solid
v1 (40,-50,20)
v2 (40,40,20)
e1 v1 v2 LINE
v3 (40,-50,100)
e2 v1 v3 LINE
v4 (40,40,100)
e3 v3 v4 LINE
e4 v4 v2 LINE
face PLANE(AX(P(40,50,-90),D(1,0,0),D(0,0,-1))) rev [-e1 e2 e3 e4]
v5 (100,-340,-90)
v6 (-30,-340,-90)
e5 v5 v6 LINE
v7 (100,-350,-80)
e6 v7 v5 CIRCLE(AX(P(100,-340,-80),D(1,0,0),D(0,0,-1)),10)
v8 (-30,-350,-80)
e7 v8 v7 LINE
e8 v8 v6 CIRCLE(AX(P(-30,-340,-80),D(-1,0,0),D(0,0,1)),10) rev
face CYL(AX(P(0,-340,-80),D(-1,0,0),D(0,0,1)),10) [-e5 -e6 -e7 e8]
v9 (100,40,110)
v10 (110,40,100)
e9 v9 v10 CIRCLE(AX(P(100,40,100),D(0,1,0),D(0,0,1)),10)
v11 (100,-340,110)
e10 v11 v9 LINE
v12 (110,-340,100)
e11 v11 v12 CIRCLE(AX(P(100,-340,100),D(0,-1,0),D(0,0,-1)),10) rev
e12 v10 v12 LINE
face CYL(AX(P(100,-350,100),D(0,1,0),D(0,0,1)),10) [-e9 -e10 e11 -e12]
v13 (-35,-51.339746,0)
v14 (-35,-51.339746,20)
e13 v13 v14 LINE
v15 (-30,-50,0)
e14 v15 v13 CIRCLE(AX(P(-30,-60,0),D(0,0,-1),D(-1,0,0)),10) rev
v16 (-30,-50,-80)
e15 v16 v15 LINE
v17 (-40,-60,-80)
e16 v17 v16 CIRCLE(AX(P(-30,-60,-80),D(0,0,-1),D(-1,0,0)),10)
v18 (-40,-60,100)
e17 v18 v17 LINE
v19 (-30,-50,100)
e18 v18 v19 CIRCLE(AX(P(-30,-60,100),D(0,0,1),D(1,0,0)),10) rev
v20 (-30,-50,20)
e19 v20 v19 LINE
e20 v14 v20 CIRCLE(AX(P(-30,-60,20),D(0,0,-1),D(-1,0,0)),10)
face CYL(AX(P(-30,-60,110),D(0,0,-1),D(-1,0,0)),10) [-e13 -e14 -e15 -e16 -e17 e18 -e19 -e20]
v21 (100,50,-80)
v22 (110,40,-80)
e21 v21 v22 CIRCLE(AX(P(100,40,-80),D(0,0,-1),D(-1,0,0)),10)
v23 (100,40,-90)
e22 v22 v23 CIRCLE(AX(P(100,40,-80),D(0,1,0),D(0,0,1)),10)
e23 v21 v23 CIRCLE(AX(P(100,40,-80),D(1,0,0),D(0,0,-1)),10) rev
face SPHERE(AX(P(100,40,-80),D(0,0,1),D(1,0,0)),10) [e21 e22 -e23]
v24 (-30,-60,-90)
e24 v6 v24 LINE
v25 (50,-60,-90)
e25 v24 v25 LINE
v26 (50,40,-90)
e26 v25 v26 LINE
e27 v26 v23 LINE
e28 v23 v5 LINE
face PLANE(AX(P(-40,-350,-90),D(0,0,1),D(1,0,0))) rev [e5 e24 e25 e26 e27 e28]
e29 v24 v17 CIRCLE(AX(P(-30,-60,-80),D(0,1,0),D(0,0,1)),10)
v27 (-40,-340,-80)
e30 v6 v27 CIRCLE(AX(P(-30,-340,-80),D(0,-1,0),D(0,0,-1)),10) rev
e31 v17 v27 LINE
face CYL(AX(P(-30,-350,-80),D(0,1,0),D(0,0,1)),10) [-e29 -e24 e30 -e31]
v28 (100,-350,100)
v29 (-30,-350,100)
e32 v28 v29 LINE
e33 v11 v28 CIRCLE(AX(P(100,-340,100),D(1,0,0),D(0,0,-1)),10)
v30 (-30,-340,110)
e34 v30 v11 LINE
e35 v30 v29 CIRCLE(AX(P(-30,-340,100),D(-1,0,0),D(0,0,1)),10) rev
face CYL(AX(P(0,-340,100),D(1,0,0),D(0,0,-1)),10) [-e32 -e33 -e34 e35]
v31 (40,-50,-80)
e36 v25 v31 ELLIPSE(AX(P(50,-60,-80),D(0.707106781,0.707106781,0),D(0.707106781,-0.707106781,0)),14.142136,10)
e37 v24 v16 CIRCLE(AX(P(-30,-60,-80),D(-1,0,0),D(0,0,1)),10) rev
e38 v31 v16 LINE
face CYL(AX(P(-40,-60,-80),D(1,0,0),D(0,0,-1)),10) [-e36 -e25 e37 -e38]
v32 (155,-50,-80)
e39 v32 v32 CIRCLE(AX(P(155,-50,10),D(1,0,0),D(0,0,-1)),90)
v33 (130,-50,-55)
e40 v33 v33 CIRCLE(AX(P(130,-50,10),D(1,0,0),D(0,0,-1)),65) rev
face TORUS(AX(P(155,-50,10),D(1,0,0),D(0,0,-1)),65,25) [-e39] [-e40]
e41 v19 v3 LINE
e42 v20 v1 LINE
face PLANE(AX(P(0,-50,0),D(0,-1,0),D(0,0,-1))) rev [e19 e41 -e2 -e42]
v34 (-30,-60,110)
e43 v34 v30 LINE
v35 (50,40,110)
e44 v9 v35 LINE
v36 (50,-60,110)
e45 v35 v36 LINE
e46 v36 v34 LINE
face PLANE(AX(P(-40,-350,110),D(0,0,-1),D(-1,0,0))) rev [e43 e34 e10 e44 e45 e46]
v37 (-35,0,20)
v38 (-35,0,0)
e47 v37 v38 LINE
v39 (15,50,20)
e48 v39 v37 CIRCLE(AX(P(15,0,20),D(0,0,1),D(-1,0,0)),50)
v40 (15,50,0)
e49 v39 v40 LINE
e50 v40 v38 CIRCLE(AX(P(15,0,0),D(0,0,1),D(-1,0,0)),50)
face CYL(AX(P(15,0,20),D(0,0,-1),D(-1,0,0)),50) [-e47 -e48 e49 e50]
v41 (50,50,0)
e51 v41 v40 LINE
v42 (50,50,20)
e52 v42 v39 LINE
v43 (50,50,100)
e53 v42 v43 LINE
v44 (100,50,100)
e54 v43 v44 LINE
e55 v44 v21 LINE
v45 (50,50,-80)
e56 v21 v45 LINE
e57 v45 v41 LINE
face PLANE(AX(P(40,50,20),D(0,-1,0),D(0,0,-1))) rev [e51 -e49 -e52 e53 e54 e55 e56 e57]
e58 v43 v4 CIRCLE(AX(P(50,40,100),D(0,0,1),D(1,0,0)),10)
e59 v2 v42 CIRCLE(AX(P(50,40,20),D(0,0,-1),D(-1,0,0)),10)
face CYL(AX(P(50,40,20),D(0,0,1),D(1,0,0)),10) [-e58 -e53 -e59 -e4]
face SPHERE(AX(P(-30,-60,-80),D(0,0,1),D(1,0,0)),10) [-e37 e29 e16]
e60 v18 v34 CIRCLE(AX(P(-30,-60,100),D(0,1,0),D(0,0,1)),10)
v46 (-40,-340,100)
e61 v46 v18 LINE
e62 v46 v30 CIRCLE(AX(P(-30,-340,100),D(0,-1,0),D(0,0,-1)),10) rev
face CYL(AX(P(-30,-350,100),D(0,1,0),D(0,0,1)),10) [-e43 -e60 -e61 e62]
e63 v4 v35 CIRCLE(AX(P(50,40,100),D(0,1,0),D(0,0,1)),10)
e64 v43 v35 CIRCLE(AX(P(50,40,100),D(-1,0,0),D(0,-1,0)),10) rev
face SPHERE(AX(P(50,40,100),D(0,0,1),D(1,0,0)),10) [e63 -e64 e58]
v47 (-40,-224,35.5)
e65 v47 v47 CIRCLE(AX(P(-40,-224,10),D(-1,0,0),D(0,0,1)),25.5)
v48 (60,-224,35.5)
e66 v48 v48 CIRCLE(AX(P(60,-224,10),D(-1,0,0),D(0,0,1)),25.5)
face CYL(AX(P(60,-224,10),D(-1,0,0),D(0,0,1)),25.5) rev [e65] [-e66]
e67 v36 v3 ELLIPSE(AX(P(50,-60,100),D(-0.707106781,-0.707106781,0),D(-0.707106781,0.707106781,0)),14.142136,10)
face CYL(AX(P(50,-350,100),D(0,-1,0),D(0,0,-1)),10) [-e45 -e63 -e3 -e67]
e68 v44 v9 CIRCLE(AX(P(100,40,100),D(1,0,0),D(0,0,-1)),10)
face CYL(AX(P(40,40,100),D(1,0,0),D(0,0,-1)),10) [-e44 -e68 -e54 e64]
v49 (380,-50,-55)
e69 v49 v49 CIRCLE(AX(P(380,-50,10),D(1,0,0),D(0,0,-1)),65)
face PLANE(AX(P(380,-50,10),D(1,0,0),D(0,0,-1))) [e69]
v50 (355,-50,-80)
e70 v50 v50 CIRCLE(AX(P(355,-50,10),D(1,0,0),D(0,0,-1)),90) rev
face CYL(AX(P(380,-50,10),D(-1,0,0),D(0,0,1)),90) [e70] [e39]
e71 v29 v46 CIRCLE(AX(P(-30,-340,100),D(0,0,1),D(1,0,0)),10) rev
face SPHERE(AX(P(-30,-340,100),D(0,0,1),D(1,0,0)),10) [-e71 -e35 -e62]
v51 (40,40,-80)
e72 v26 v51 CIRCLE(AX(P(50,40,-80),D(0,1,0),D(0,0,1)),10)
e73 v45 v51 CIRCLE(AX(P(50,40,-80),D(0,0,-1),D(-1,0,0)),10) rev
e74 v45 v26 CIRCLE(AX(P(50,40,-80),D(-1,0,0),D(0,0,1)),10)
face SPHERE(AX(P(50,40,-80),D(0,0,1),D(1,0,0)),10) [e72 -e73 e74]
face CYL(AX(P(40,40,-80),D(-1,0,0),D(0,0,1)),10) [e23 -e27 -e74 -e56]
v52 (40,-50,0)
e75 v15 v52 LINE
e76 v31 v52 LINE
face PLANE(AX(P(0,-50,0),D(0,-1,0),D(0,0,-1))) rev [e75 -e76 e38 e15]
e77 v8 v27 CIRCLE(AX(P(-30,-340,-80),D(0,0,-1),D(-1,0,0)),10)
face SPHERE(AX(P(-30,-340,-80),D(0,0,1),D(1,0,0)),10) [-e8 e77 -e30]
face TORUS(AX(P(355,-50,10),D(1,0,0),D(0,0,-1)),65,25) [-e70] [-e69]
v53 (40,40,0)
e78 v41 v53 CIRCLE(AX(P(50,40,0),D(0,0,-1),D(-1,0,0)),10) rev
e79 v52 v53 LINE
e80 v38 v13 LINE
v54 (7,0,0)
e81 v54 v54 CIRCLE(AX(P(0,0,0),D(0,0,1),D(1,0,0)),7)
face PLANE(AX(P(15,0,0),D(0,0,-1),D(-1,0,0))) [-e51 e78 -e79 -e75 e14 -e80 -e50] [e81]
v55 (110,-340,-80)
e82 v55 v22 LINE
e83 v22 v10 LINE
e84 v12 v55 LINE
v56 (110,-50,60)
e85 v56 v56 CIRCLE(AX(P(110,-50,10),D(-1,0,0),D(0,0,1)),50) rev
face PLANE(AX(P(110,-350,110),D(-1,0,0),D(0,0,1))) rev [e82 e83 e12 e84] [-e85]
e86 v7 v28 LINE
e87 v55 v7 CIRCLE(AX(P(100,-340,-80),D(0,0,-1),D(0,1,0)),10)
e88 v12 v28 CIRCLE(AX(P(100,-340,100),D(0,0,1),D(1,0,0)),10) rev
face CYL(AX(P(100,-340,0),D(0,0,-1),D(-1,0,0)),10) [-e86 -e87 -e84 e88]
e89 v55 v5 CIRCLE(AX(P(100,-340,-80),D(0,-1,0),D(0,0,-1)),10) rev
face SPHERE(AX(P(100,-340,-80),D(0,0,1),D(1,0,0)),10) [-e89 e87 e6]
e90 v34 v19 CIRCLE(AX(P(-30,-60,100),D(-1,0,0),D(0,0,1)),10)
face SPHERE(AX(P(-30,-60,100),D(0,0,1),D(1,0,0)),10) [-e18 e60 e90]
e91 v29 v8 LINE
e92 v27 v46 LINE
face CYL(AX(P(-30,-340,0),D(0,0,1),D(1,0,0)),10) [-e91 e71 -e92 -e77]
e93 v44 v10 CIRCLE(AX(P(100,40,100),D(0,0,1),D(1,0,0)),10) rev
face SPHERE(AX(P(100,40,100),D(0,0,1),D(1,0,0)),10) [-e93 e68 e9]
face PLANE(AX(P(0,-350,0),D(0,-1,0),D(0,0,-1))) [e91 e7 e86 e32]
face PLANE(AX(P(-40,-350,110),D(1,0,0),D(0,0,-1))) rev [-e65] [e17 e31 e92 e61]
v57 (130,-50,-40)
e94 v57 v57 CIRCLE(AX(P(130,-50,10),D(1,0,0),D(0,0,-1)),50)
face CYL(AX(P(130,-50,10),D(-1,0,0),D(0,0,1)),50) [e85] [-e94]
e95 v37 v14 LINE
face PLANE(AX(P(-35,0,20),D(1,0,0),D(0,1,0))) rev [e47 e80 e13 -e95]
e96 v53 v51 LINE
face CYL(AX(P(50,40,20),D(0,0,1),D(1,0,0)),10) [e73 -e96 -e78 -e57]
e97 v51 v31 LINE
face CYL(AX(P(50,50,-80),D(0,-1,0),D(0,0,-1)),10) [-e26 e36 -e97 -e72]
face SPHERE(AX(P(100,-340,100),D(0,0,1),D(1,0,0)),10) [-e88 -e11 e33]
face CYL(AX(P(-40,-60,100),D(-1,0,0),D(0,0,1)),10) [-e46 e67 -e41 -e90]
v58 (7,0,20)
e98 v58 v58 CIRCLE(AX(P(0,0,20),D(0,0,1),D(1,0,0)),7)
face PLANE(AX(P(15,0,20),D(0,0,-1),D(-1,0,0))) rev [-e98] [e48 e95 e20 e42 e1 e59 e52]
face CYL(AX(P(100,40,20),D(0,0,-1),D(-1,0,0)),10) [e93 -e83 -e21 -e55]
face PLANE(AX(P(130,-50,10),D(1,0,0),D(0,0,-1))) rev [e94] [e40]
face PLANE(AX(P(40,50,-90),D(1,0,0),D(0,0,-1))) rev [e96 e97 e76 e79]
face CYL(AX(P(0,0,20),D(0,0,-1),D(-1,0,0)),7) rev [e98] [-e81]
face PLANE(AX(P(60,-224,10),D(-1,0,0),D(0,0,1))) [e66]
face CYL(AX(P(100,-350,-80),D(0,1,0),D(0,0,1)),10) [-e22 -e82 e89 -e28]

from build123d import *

# Parameters (mm, degrees)
SKETCH_1_R          = 7
EXTRUDE_1_DEPTH     = 20
SKETCH_2_W          = 150
SKETCH_2_H          = 200
EXTRUDE_2_DEPTH     = 300
SKETCH_3_W          = 70
SKETCH_3_H          = 200
EXTRUDE_3_DEPTH     = 100
SKETCH_4_R          = 50
EXTRUDE_4_DEPTH     = 20
SKETCH_5_R          = 90
EXTRUDE_5_DEPTH     = 250
FILLET_1_R          = 25
FILLET_2_R          = 10
SKETCH_6_R          = 25.5
CUT_EXTRUDE_1_DEPTH = 100


with BuildPart() as part:
    # 草图1 → 凸台-拉伸1 (new body)
    with BuildSketch(Plane.XY):
        with BuildLine():
            Line((-35, 0), (-35, -50))
            Line((-35, -50), (40, -50))
            Line((40, -50), (40, 50))
            Line((40, 50), (15, 50))
            ThreePointArc((15, 50), (-20.355339059, 35.355339059), (-35, 0))
        make_face()
        Circle(SKETCH_1_R, mode=Mode.SUBTRACT)
    extrude(amount=EXTRUDE_1_DEPTH)

    # 草图2 → 凸台-拉伸2 (add)
    with BuildSketch(Plane(origin=(0, -50, 0), x_dir=(-1, 0, 0), z_dir=(0, -1, 0))):
        with Locations((-35, -10)):
            Rectangle(SKETCH_2_W, SKETCH_2_H)
    extrude(amount=EXTRUDE_2_DEPTH)

    # 草图3 → 凸台-拉伸3 (add)
    with BuildSketch(Plane(origin=(0, -50, 0), x_dir=(1, 0, 0), z_dir=(0, 1, 0))):
        with Locations((75, -10)):
            Rectangle(SKETCH_3_W, SKETCH_3_H)
    extrude(amount=EXTRUDE_3_DEPTH)

    # 草图4 → 凸台-拉伸4 (add)
    with BuildSketch(Plane(origin=(110, 0, 0), x_dir=(0, 0, -1), z_dir=(1, 0, 0))):
        with Locations(Location((-10, -50, 0), (0, 0, 180))):
            Circle(SKETCH_4_R)
    extrude(amount=EXTRUDE_4_DEPTH)

    # 草图5 → 凸台-拉伸5 (add)
    with BuildSketch(Plane(origin=(130, 0, 0), x_dir=(0, 0, -1), z_dir=(1, 0, 0))):
        with Locations((-10, -50)):
            Circle(SKETCH_5_R)
    extrude(amount=EXTRUDE_5_DEPTH)

    # 圆角1
    fillet_1_edges = [part.edges().sort_by_distance(p)[0] for p in [
        (130, -50, 100),
        (380, -50, 100),
    ]]
    fillet(fillet_1_edges, radius=FILLET_1_R)

    # 圆角2
    # the kernel refuses this fillet: 10 mm, written as the material it takes off along each edge
    with BuildSketch(Plane(origin=(50, 40, 100), x_dir=(-1, 0, 0), z_dir=(0, 1, 0))) as fillet_2_piece_1_section:
        Polygon((0, 0), (FILLET_2_R, 0), (FILLET_2_R, FILLET_2_R), (0, FILLET_2_R), align=None)
    fillet_2_piece_1 = extrude(amount=FILLET_2_R, mode=Mode.PRIVATE)
    fillet_2_piece_1 = fillet_2_piece_1 - Plane(origin=(50, 40, 100), x_dir=(0.7071067811865475, 0, -0.7071067811865477), z_dir=(0, 1, 0)) * Sphere(FILLET_2_R, mode=Mode.PRIVATE)
    add(fillet_2_piece_1, mode=Mode.SUBTRACT)
    with BuildSketch(Plane(origin=(100, 40, 100), x_dir=(1, 0, 0), z_dir=(0, 1, 0))) as fillet_2_piece_2_section:
        Polygon((0, 0), (FILLET_2_R, 0), (FILLET_2_R, -FILLET_2_R), (0, -FILLET_2_R), align=None)
    fillet_2_piece_2 = extrude(amount=FILLET_2_R, mode=Mode.PRIVATE)
    fillet_2_piece_2 = fillet_2_piece_2 - Plane(origin=(100, 40, 100), x_dir=(-0.7071067811865475, 0, -0.7071067811865476), z_dir=(0, 1, 0)) * Sphere(FILLET_2_R, mode=Mode.PRIVATE)
    add(fillet_2_piece_2, mode=Mode.SUBTRACT)
    with BuildSketch(Plane(origin=(-30, -60, -80), x_dir=(-1, 0, 0), z_dir=(0, 0, -1))) as fillet_2_piece_3_section:
        Polygon((0, 0), (FILLET_2_R, 0), (FILLET_2_R, FILLET_2_R), (0, FILLET_2_R), align=None)
    fillet_2_piece_3 = extrude(amount=FILLET_2_R, mode=Mode.PRIVATE)
    fillet_2_piece_3 = fillet_2_piece_3 - Plane(origin=(-30, -60, -80), x_dir=(0.7071067811865475, -0.7071067811865475, 0), z_dir=(0, 0, -1)) * Sphere(FILLET_2_R, mode=Mode.PRIVATE)
    add(fillet_2_piece_3, mode=Mode.SUBTRACT)
    with BuildSketch(Plane(origin=(-30, -60, 100), x_dir=(0, 1, 0), z_dir=(-1, 0, 0))) as fillet_2_piece_4_section:
        Polygon((0, 0), (FILLET_2_R, 0), (FILLET_2_R, -FILLET_2_R), (0, -FILLET_2_R), align=None)
    fillet_2_piece_4 = extrude(amount=FILLET_2_R, mode=Mode.PRIVATE)
    fillet_2_piece_4 = fillet_2_piece_4 - Plane(origin=(-30, -60, 100), x_dir=(0, -0.7071067811865475, -0.7071067811865475), z_dir=(-1, 0, 0)) * Sphere(FILLET_2_R, mode=Mode.PRIVATE)
    add(fillet_2_piece_4, mode=Mode.SUBTRACT)
    with BuildSketch(Plane(origin=(-30, -340, 100), x_dir=(-1, 0, 0), z_dir=(0, -1, 0))) as fillet_2_piece_5_section:
        Polygon((0, 0), (FILLET_2_R, 0), (FILLET_2_R, -FILLET_2_R), (0, -FILLET_2_R), align=None)
    fillet_2_piece_5 = extrude(amount=FILLET_2_R, mode=Mode.PRIVATE)
    fillet_2_piece_5 = fillet_2_piece_5 - Plane(origin=(-30, -340, 100), x_dir=(0.7071067811865475, 0, -0.7071067811865475), z_dir=(0, -1, 0)) * Sphere(FILLET_2_R, mode=Mode.PRIVATE)
    add(fillet_2_piece_5, mode=Mode.SUBTRACT)
    with BuildSketch(Plane(origin=(100, -340, 100), x_dir=(1, 0, 0), z_dir=(0, -1, 0))) as fillet_2_piece_6_section:
        Polygon((0, 0), (FILLET_2_R, 0), (FILLET_2_R, FILLET_2_R), (0, FILLET_2_R), align=None)
    fillet_2_piece_6 = extrude(amount=FILLET_2_R, mode=Mode.PRIVATE)
    fillet_2_piece_6 = fillet_2_piece_6 - Plane(origin=(100, -340, 100), x_dir=(-0.7071067811865475, 0, -0.7071067811865476), z_dir=(0, -1, 0)) * Sphere(FILLET_2_R, mode=Mode.PRIVATE)
    add(fillet_2_piece_6, mode=Mode.SUBTRACT)
    with BuildSketch(Plane(origin=(100, -340, -80), x_dir=(0, 0, -1), z_dir=(0, -1, 0))) as fillet_2_piece_7_section:
        Polygon((0, 0), (FILLET_2_R, 0), (FILLET_2_R, FILLET_2_R), (0, FILLET_2_R), align=None)
    fillet_2_piece_7 = extrude(amount=FILLET_2_R, mode=Mode.PRIVATE)
    fillet_2_piece_7 = fillet_2_piece_7 - Plane(origin=(100, -340, -80), x_dir=(-0.7071067811865475, 0, 0.7071067811865475), z_dir=(0, -1, 0)) * Sphere(FILLET_2_R, mode=Mode.PRIVATE)
    add(fillet_2_piece_7, mode=Mode.SUBTRACT)
    with BuildSketch(Plane(origin=(-30, -340, -80), x_dir=(0, 0, -1), z_dir=(0, -1, 0))) as fillet_2_piece_8_section:
        Polygon((0, 0), (FILLET_2_R, 0), (FILLET_2_R, -FILLET_2_R), (0, -FILLET_2_R), align=None)
    fillet_2_piece_8 = extrude(amount=FILLET_2_R, mode=Mode.PRIVATE)
    fillet_2_piece_8 = fillet_2_piece_8 - Plane(origin=(-30, -340, -80), x_dir=(0.7071067811865475, 0, 0.7071067811865476), z_dir=(0, -1, 0)) * Sphere(FILLET_2_R, mode=Mode.PRIVATE)
    add(fillet_2_piece_8, mode=Mode.SUBTRACT)
    with BuildSketch(Plane(origin=(50, 40, -80), x_dir=(0, 0, -1), z_dir=(0, 1, 0))) as fillet_2_piece_9_section:
        Polygon((0, 0), (FILLET_2_R, 0), (FILLET_2_R, FILLET_2_R), (0, FILLET_2_R), align=None)
    fillet_2_piece_9 = extrude(amount=FILLET_2_R, mode=Mode.PRIVATE)
    fillet_2_piece_9 = fillet_2_piece_9 - Plane(origin=(50, 40, -80), x_dir=(0.7071067811865475, 0, 0.7071067811865475), z_dir=(0, 1, 0)) * Sphere(FILLET_2_R, mode=Mode.PRIVATE)
    add(fillet_2_piece_9, mode=Mode.SUBTRACT)
    with BuildSketch(Plane(origin=(100, 40, -80), x_dir=(0, 0, -1), z_dir=(0, 1, 0))) as fillet_2_piece_10_section:
        Polygon((0, 0), (FILLET_2_R, 0), (FILLET_2_R, -FILLET_2_R), (0, -FILLET_2_R), align=None)
    fillet_2_piece_10 = extrude(amount=FILLET_2_R, mode=Mode.PRIVATE)
    fillet_2_piece_10 = fillet_2_piece_10 - Plane(origin=(100, 40, -80), x_dir=(-0.7071067811865475, 0, 0.7071067811865475), z_dir=(0, 1, 0)) * Sphere(FILLET_2_R, mode=Mode.PRIVATE)
    add(fillet_2_piece_10, mode=Mode.SUBTRACT)
    with BuildSketch(Plane(origin=(50, 50, 110), x_dir=(0, -1, 0), z_dir=(1, 0, 0))) as fillet_2_piece_11:
        with BuildLine():
            CenterArc((FILLET_2_R, FILLET_2_R), FILLET_2_R, 180, 90)
            Line((0, FILLET_2_R), (0, 0))
            Line((0, 0), (FILLET_2_R, 0))
        make_face()
    extrude(amount=50, mode=Mode.SUBTRACT)
    with BuildSketch(Plane(origin=(40, -50, 110), x_dir=(1, 0, 0), z_dir=(0, 1, 0))) as fillet_2_piece_12:
        with BuildLine():
            CenterArc((FILLET_2_R, FILLET_2_R), FILLET_2_R, 180, 90)
            Line((0, FILLET_2_R), (0, 0))
            Line((0, 0), (FILLET_2_R, 0))
        make_face()
    extrude(amount=90, mode=Mode.SUBTRACT)
    with BuildSketch(Plane(origin=(-40, -50, -80), x_dir=(0, -1, 0), z_dir=(0, 0, 1))) as fillet_2_piece_13_section:
        with BuildLine():
            CenterArc((FILLET_2_R, FILLET_2_R), FILLET_2_R, 180, 90)
            Line((0, FILLET_2_R), (0, 0))
            Line((0, 0), (FILLET_2_R, 0))
        make_face()
    fillet_2_piece_13 = extrude(amount=180, mode=Mode.PRIVATE)
    fillet_2_piece_13 = split(fillet_2_piece_13, bisect_by=Plane(origin=(-38.356082357, -52.5512006, 0), z_dir=(0, 0, -1)), keep=Keep.TOP, mode=Mode.PRIVATE)
    fillet_2_piece_13 = split(fillet_2_piece_13, bisect_by=Plane(origin=(-35, -52.5512006, -40), z_dir=(-1, 0, 0)), keep=Keep.TOP, mode=Mode.PRIVATE)
    add(fillet_2_piece_13, mode=Mode.SUBTRACT)
    with BuildSketch(Plane(origin=(-40, -50, -80), x_dir=(0, -1, 0), z_dir=(0, 0, 1))) as fillet_2_piece_14_section:
        with BuildLine():
            CenterArc((FILLET_2_R, FILLET_2_R), FILLET_2_R, 180, 90)
            Line((0, FILLET_2_R), (0, 0))
            Line((0, 0), (FILLET_2_R, 0))
        make_face()
    fillet_2_piece_14 = extrude(amount=180, mode=Mode.PRIVATE)
    fillet_2_piece_14 = split(fillet_2_piece_14, bisect_by=Plane(origin=(-33.367492155, -50.240083817, 0), z_dir=(0, 0, -1)), keep=Keep.TOP, mode=Mode.PRIVATE)
    fillet_2_piece_14 = split(fillet_2_piece_14, bisect_by=Plane(origin=(-35, -50.240083817, -40), z_dir=(1, 0, 0)), keep=Keep.TOP, mode=Mode.PRIVATE)
    add(fillet_2_piece_14, mode=Mode.SUBTRACT)
    with BuildSketch(Plane(origin=(-40, -50, -80), x_dir=(0, -1, 0), z_dir=(0, 0, 1))) as fillet_2_piece_15_section:
        with BuildLine():
            CenterArc((FILLET_2_R, FILLET_2_R), FILLET_2_R, 180, 90)
            Line((0, FILLET_2_R), (0, 0))
            Line((0, 0), (FILLET_2_R, 0))
        make_face()
    fillet_2_piece_15 = extrude(amount=180, mode=Mode.PRIVATE)
    fillet_2_piece_15 = split(fillet_2_piece_15, bisect_by=Plane(origin=(-38.356082357, -52.5512006, 0), z_dir=(0, 0, 1)), keep=Keep.TOP, mode=Mode.PRIVATE)
    fillet_2_piece_15 = split(fillet_2_piece_15, bisect_by=Plane(origin=(-35, -52.5512006, 10), z_dir=(-1, 0, 0)), keep=Keep.TOP, mode=Mode.PRIVATE)
    fillet_2_piece_15 = split(fillet_2_piece_15, bisect_by=Plane(origin=(-38.356082357, -52.5512006, 20), z_dir=(0, 0, -1)), keep=Keep.TOP, mode=Mode.PRIVATE)
    add(fillet_2_piece_15, mode=Mode.SUBTRACT)
    with BuildSketch(Plane(origin=(-40, -50, -80), x_dir=(0, -1, 0), z_dir=(0, 0, 1))) as fillet_2_piece_16_section:
        with BuildLine():
            CenterArc((FILLET_2_R, FILLET_2_R), FILLET_2_R, 180, 90)
            Line((0, FILLET_2_R), (0, 0))
            Line((0, 0), (FILLET_2_R, 0))
        make_face()
    fillet_2_piece_16 = extrude(amount=180, mode=Mode.PRIVATE)
    fillet_2_piece_16 = split(fillet_2_piece_16, bisect_by=Plane(origin=(-35, -52.5512006, 60), z_dir=(-1, 0, 0)), keep=Keep.TOP, mode=Mode.PRIVATE)
    fillet_2_piece_16 = split(fillet_2_piece_16, bisect_by=Plane(origin=(-38.356082357, -52.5512006, 20), z_dir=(0, 0, 1)), keep=Keep.TOP, mode=Mode.PRIVATE)
    add(fillet_2_piece_16, mode=Mode.SUBTRACT)
    with BuildSketch(Plane(origin=(-40, -50, -80), x_dir=(0, -1, 0), z_dir=(0, 0, 1))) as fillet_2_piece_17_section:
        with BuildLine():
            CenterArc((FILLET_2_R, FILLET_2_R), FILLET_2_R, 180, 90)
            Line((0, FILLET_2_R), (0, 0))
            Line((0, 0), (FILLET_2_R, 0))
        make_face()
    fillet_2_piece_17 = extrude(amount=180, mode=Mode.PRIVATE)
    fillet_2_piece_17 = split(fillet_2_piece_17, bisect_by=Plane(origin=(-35, -50.240083817, 60), z_dir=(1, 0, 0)), keep=Keep.TOP, mode=Mode.PRIVATE)
    fillet_2_piece_17 = split(fillet_2_piece_17, bisect_by=Plane(origin=(-33.367492155, -50.240083817, 20), z_dir=(0, 0, 1)), keep=Keep.TOP, mode=Mode.PRIVATE)
    add(fillet_2_piece_17, mode=Mode.SUBTRACT)
    with BuildSketch(Plane(origin=(-40, -60, 110), x_dir=(1, 0, 0), z_dir=(0, -1, 0))) as fillet_2_piece_18:
        with BuildLine():
            CenterArc((FILLET_2_R, -FILLET_2_R), FILLET_2_R, 90, 90)
            Line((0, -FILLET_2_R), (0, 0))
            Line((0, 0), (FILLET_2_R, 0))
        make_face()
    extrude(amount=280, mode=Mode.SUBTRACT)
    with BuildSketch(Plane(origin=(110, -340, 110), x_dir=(0, 0, -1), z_dir=(0, 1, 0))) as fillet_2_piece_19:
        with BuildLine():
            CenterArc((FILLET_2_R, FILLET_2_R), FILLET_2_R, 180, 90)
            Line((0, FILLET_2_R), (0, 0))
            Line((0, 0), (FILLET_2_R, 0))
        make_face()
    extrude(amount=380, mode=Mode.SUBTRACT)
    with BuildSketch(Plane(origin=(110, -350, 100), x_dir=(0, 1, 0), z_dir=(0, 0, -1))) as fillet_2_piece_20:
        with BuildLine():
            CenterArc((FILLET_2_R, -FILLET_2_R), FILLET_2_R, 90, 90)
            Line((0, -FILLET_2_R), (0, 0))
            Line((0, 0), (FILLET_2_R, 0))
        make_face()
    extrude(amount=180, mode=Mode.SUBTRACT)
    with BuildSketch(Plane(origin=(-30, -350, 110), x_dir=(0, 1, 0), z_dir=(1, 0, 0))) as fillet_2_piece_21:
        with BuildLine():
            CenterArc((FILLET_2_R, -FILLET_2_R), FILLET_2_R, 90, 90)
            Line((0, -FILLET_2_R), (0, 0))
            Line((0, 0), (FILLET_2_R, 0))
        make_face()
    extrude(amount=130, mode=Mode.SUBTRACT)
    with BuildSketch(Plane(origin=(-40, -350, -80), x_dir=(1, 0, 0), z_dir=(0, 0, 1)), Plane(origin=(110, 50, 100), x_dir=(0, -1, 0), z_dir=(0, 0, -1))) as fillet_2_piece_22:
        with BuildLine():
            CenterArc((FILLET_2_R, FILLET_2_R), FILLET_2_R, 180, 90)
            Line((0, FILLET_2_R), (0, 0))
            Line((0, 0), (FILLET_2_R, 0))
        make_face()
    extrude(amount=180, mode=Mode.SUBTRACT)
    with BuildSketch(Plane(origin=(40, -50, -90), x_dir=(0, -1, 0), z_dir=(-1, 0, 0)), Plane(origin=(-30, -50, 110), x_dir=(0, -1, 0), z_dir=(1, 0, 0))) as fillet_2_piece_23:
        with BuildLine():
            CenterArc((FILLET_2_R, FILLET_2_R), FILLET_2_R, 180, 90)
            Line((0, FILLET_2_R), (0, 0))
            Line((0, 0), (FILLET_2_R, 0))
        make_face()
    extrude(amount=70, mode=Mode.SUBTRACT)
    with BuildSketch(Plane(origin=(40, -50, -90), x_dir=(1, 0, 0), z_dir=(0, 1, 0))) as fillet_2_piece_24:
        with BuildLine():
            CenterArc((FILLET_2_R, -FILLET_2_R), FILLET_2_R, 90, 90)
            Line((0, -FILLET_2_R), (0, 0))
            Line((0, 0), (FILLET_2_R, 0))
        make_face()
    extrude(amount=90, mode=Mode.SUBTRACT)
    with BuildSketch(Plane(origin=(100, 50, -90), x_dir=(0, 0, 1), z_dir=(-1, 0, 0))) as fillet_2_piece_25:
        with BuildLine():
            CenterArc((FILLET_2_R, -FILLET_2_R), FILLET_2_R, 90, 90)
            Line((0, -FILLET_2_R), (0, 0))
            Line((0, 0), (FILLET_2_R, 0))
        make_face()
    extrude(amount=50, mode=Mode.SUBTRACT)
    with BuildSketch(Plane(origin=(-40, -60, -90), x_dir=(1, 0, 0), z_dir=(0, -1, 0))) as fillet_2_piece_26:
        with BuildLine():
            CenterArc((FILLET_2_R, FILLET_2_R), FILLET_2_R, 180, 90)
            Line((0, FILLET_2_R), (0, 0))
            Line((0, 0), (FILLET_2_R, 0))
        make_face()
    extrude(amount=280, mode=Mode.SUBTRACT)
    with BuildSketch(Plane(origin=(100, -350, -90), x_dir=(0, 0, 1), z_dir=(-1, 0, 0))) as fillet_2_piece_27:
        with BuildLine():
            CenterArc((FILLET_2_R, FILLET_2_R), FILLET_2_R, 180, 90)
            Line((0, FILLET_2_R), (0, 0))
            Line((0, 0), (FILLET_2_R, 0))
        make_face()
    extrude(amount=130, mode=Mode.SUBTRACT)
    with BuildSketch(Plane(origin=(110, -340, -90), x_dir=(0, 0, 1), z_dir=(0, 1, 0))) as fillet_2_piece_28:
        with BuildLine():
            CenterArc((FILLET_2_R, -FILLET_2_R), FILLET_2_R, 90, 90)
            Line((0, -FILLET_2_R), (0, 0))
            Line((0, 0), (FILLET_2_R, 0))
        make_face()
    extrude(amount=380, mode=Mode.SUBTRACT)
    with BuildSketch(Plane(origin=(40, 50, -80), x_dir=(1, 0, 0), z_dir=(0, 0, 1)), Plane(origin=(40, 50, 20), x_dir=(1, 0, 0), z_dir=(0, 0, 1))) as fillet_2_piece_29:
        with BuildLine():
            CenterArc((FILLET_2_R, -FILLET_2_R), FILLET_2_R, 90, 90)
            Line((0, -FILLET_2_R), (0, 0))
            Line((0, 0), (FILLET_2_R, 0))
        make_face()
    extrude(amount=80, mode=Mode.SUBTRACT)
    with BuildSketch(Plane(origin=(40, 50, -80), x_dir=(1, 0, 0), z_dir=(0, 0, 1))) as fillet_2_piece_30_section:
        with BuildLine():
            CenterArc((FILLET_2_R, -FILLET_2_R), FILLET_2_R, 90, 90)
            Line((0, -FILLET_2_R), (0, 0))
            Line((0, 0), (FILLET_2_R, 0))
        make_face()
    fillet_2_piece_30 = extrude(amount=105, mode=Mode.PRIVATE)
    fillet_2_piece_30 = split(fillet_2_piece_30, bisect_by=Plane(origin=(42.263951143, 47.736048857, 20), z_dir=(0, 0, 1)), keep=Keep.TOP, mode=Mode.PRIVATE)
    add(fillet_2_piece_30, mode=Mode.SUBTRACT)
    with BuildSketch(Plane(origin=(40, 50, -5), x_dir=(1, 0, 0), z_dir=(0, 0, 1))) as fillet_2_piece_31_section:
        with BuildLine():
            CenterArc((FILLET_2_R, -FILLET_2_R), FILLET_2_R, 90, 90)
            Line((0, -FILLET_2_R), (0, 0))
            Line((0, 0), (FILLET_2_R, 0))
        make_face()
    fillet_2_piece_31 = extrude(amount=105, mode=Mode.PRIVATE)
    fillet_2_piece_31 = split(fillet_2_piece_31, bisect_by=Plane(origin=(42.263951143, 47.736048857, 0), z_dir=(0, 0, -1)), keep=Keep.TOP, mode=Mode.PRIVATE)
    add(fillet_2_piece_31, mode=Mode.SUBTRACT)
    with BuildSketch(Plane(origin=(40, -75, 110), x_dir=(1, 0, 0), z_dir=(0, 1, 0))) as fillet_2_piece_32a_section:
        with BuildLine():
            CenterArc((FILLET_2_R, FILLET_2_R), FILLET_2_R, 180, 90)
            Line((0, FILLET_2_R), (0, 0))
            Line((0, 0), (FILLET_2_R, 0))
        make_face()
    fillet_2_piece_32a = extrude(amount=115, mode=Mode.PRIVATE)
    fillet_2_piece_32a = split(fillet_2_piece_32a, bisect_by=Plane(origin=(42.263951143, -50, 107.736048857), z_dir=(0, -1, 0)), keep=Keep.TOP, mode=Mode.PRIVATE)
    with BuildSketch(Plane(origin=(-30, -50, 110), x_dir=(0, -1, 0), z_dir=(1, 0, 0))) as fillet_2_piece_32b_section:
        with BuildLine():
            CenterArc((FILLET_2_R, FILLET_2_R), FILLET_2_R, 180, 90)
            Line((0, FILLET_2_R), (0, 0))
            Line((0, 0), (FILLET_2_R, 0))
        make_face()
    fillet_2_piece_32b = extrude(amount=95, mode=Mode.PRIVATE)
    fillet_2_piece_32b = split(fillet_2_piece_32b, bisect_by=Plane(origin=(40, -52.263951143, 107.736048857), z_dir=(1, 0, 0)), keep=Keep.TOP, mode=Mode.PRIVATE)
    fillet_2_piece_32 = fillet_2_piece_32a & fillet_2_piece_32b
    add(fillet_2_piece_32, mode=Mode.SUBTRACT)
    with BuildSketch(Plane(origin=(65, -50, -90), x_dir=(0, -1, 0), z_dir=(-1, 0, 0))) as fillet_2_piece_33a_section:
        with BuildLine():
            CenterArc((FILLET_2_R, FILLET_2_R), FILLET_2_R, 180, 90)
            Line((0, FILLET_2_R), (0, 0))
            Line((0, 0), (FILLET_2_R, 0))
        make_face()
    fillet_2_piece_33a = extrude(amount=95, mode=Mode.PRIVATE)
    fillet_2_piece_33a = split(fillet_2_piece_33a, bisect_by=Plane(origin=(40, -52.263951143, -87.736048857), z_dir=(1, 0, 0)), keep=Keep.TOP, mode=Mode.PRIVATE)
    with BuildSketch(Plane(origin=(40, -75, -90), x_dir=(1, 0, 0), z_dir=(0, 1, 0))) as fillet_2_piece_33b_section:
        with BuildLine():
            CenterArc((FILLET_2_R, -FILLET_2_R), FILLET_2_R, 90, 90)
            Line((0, -FILLET_2_R), (0, 0))
            Line((0, 0), (FILLET_2_R, 0))
        make_face()
    fillet_2_piece_33b = extrude(amount=115, mode=Mode.PRIVATE)
    fillet_2_piece_33b = split(fillet_2_piece_33b, bisect_by=Plane(origin=(42.263951143, -50, -87.736048857), z_dir=(0, -1, 0)), keep=Keep.TOP, mode=Mode.PRIVATE)
    fillet_2_piece_33 = fillet_2_piece_33a & fillet_2_piece_33b
    add(fillet_2_piece_33, mode=Mode.SUBTRACT)

    # 草图6 → 切除-拉伸1 (cut)
    with BuildSketch(Plane.ZY.offset(40)):
        with Locations((10, -224)):
            Circle(SKETCH_6_R)
    extrude(amount=-CUT_EXTRUDE_1_DEPTH, mode=Mode.SUBTRACT)


solid = part.part
